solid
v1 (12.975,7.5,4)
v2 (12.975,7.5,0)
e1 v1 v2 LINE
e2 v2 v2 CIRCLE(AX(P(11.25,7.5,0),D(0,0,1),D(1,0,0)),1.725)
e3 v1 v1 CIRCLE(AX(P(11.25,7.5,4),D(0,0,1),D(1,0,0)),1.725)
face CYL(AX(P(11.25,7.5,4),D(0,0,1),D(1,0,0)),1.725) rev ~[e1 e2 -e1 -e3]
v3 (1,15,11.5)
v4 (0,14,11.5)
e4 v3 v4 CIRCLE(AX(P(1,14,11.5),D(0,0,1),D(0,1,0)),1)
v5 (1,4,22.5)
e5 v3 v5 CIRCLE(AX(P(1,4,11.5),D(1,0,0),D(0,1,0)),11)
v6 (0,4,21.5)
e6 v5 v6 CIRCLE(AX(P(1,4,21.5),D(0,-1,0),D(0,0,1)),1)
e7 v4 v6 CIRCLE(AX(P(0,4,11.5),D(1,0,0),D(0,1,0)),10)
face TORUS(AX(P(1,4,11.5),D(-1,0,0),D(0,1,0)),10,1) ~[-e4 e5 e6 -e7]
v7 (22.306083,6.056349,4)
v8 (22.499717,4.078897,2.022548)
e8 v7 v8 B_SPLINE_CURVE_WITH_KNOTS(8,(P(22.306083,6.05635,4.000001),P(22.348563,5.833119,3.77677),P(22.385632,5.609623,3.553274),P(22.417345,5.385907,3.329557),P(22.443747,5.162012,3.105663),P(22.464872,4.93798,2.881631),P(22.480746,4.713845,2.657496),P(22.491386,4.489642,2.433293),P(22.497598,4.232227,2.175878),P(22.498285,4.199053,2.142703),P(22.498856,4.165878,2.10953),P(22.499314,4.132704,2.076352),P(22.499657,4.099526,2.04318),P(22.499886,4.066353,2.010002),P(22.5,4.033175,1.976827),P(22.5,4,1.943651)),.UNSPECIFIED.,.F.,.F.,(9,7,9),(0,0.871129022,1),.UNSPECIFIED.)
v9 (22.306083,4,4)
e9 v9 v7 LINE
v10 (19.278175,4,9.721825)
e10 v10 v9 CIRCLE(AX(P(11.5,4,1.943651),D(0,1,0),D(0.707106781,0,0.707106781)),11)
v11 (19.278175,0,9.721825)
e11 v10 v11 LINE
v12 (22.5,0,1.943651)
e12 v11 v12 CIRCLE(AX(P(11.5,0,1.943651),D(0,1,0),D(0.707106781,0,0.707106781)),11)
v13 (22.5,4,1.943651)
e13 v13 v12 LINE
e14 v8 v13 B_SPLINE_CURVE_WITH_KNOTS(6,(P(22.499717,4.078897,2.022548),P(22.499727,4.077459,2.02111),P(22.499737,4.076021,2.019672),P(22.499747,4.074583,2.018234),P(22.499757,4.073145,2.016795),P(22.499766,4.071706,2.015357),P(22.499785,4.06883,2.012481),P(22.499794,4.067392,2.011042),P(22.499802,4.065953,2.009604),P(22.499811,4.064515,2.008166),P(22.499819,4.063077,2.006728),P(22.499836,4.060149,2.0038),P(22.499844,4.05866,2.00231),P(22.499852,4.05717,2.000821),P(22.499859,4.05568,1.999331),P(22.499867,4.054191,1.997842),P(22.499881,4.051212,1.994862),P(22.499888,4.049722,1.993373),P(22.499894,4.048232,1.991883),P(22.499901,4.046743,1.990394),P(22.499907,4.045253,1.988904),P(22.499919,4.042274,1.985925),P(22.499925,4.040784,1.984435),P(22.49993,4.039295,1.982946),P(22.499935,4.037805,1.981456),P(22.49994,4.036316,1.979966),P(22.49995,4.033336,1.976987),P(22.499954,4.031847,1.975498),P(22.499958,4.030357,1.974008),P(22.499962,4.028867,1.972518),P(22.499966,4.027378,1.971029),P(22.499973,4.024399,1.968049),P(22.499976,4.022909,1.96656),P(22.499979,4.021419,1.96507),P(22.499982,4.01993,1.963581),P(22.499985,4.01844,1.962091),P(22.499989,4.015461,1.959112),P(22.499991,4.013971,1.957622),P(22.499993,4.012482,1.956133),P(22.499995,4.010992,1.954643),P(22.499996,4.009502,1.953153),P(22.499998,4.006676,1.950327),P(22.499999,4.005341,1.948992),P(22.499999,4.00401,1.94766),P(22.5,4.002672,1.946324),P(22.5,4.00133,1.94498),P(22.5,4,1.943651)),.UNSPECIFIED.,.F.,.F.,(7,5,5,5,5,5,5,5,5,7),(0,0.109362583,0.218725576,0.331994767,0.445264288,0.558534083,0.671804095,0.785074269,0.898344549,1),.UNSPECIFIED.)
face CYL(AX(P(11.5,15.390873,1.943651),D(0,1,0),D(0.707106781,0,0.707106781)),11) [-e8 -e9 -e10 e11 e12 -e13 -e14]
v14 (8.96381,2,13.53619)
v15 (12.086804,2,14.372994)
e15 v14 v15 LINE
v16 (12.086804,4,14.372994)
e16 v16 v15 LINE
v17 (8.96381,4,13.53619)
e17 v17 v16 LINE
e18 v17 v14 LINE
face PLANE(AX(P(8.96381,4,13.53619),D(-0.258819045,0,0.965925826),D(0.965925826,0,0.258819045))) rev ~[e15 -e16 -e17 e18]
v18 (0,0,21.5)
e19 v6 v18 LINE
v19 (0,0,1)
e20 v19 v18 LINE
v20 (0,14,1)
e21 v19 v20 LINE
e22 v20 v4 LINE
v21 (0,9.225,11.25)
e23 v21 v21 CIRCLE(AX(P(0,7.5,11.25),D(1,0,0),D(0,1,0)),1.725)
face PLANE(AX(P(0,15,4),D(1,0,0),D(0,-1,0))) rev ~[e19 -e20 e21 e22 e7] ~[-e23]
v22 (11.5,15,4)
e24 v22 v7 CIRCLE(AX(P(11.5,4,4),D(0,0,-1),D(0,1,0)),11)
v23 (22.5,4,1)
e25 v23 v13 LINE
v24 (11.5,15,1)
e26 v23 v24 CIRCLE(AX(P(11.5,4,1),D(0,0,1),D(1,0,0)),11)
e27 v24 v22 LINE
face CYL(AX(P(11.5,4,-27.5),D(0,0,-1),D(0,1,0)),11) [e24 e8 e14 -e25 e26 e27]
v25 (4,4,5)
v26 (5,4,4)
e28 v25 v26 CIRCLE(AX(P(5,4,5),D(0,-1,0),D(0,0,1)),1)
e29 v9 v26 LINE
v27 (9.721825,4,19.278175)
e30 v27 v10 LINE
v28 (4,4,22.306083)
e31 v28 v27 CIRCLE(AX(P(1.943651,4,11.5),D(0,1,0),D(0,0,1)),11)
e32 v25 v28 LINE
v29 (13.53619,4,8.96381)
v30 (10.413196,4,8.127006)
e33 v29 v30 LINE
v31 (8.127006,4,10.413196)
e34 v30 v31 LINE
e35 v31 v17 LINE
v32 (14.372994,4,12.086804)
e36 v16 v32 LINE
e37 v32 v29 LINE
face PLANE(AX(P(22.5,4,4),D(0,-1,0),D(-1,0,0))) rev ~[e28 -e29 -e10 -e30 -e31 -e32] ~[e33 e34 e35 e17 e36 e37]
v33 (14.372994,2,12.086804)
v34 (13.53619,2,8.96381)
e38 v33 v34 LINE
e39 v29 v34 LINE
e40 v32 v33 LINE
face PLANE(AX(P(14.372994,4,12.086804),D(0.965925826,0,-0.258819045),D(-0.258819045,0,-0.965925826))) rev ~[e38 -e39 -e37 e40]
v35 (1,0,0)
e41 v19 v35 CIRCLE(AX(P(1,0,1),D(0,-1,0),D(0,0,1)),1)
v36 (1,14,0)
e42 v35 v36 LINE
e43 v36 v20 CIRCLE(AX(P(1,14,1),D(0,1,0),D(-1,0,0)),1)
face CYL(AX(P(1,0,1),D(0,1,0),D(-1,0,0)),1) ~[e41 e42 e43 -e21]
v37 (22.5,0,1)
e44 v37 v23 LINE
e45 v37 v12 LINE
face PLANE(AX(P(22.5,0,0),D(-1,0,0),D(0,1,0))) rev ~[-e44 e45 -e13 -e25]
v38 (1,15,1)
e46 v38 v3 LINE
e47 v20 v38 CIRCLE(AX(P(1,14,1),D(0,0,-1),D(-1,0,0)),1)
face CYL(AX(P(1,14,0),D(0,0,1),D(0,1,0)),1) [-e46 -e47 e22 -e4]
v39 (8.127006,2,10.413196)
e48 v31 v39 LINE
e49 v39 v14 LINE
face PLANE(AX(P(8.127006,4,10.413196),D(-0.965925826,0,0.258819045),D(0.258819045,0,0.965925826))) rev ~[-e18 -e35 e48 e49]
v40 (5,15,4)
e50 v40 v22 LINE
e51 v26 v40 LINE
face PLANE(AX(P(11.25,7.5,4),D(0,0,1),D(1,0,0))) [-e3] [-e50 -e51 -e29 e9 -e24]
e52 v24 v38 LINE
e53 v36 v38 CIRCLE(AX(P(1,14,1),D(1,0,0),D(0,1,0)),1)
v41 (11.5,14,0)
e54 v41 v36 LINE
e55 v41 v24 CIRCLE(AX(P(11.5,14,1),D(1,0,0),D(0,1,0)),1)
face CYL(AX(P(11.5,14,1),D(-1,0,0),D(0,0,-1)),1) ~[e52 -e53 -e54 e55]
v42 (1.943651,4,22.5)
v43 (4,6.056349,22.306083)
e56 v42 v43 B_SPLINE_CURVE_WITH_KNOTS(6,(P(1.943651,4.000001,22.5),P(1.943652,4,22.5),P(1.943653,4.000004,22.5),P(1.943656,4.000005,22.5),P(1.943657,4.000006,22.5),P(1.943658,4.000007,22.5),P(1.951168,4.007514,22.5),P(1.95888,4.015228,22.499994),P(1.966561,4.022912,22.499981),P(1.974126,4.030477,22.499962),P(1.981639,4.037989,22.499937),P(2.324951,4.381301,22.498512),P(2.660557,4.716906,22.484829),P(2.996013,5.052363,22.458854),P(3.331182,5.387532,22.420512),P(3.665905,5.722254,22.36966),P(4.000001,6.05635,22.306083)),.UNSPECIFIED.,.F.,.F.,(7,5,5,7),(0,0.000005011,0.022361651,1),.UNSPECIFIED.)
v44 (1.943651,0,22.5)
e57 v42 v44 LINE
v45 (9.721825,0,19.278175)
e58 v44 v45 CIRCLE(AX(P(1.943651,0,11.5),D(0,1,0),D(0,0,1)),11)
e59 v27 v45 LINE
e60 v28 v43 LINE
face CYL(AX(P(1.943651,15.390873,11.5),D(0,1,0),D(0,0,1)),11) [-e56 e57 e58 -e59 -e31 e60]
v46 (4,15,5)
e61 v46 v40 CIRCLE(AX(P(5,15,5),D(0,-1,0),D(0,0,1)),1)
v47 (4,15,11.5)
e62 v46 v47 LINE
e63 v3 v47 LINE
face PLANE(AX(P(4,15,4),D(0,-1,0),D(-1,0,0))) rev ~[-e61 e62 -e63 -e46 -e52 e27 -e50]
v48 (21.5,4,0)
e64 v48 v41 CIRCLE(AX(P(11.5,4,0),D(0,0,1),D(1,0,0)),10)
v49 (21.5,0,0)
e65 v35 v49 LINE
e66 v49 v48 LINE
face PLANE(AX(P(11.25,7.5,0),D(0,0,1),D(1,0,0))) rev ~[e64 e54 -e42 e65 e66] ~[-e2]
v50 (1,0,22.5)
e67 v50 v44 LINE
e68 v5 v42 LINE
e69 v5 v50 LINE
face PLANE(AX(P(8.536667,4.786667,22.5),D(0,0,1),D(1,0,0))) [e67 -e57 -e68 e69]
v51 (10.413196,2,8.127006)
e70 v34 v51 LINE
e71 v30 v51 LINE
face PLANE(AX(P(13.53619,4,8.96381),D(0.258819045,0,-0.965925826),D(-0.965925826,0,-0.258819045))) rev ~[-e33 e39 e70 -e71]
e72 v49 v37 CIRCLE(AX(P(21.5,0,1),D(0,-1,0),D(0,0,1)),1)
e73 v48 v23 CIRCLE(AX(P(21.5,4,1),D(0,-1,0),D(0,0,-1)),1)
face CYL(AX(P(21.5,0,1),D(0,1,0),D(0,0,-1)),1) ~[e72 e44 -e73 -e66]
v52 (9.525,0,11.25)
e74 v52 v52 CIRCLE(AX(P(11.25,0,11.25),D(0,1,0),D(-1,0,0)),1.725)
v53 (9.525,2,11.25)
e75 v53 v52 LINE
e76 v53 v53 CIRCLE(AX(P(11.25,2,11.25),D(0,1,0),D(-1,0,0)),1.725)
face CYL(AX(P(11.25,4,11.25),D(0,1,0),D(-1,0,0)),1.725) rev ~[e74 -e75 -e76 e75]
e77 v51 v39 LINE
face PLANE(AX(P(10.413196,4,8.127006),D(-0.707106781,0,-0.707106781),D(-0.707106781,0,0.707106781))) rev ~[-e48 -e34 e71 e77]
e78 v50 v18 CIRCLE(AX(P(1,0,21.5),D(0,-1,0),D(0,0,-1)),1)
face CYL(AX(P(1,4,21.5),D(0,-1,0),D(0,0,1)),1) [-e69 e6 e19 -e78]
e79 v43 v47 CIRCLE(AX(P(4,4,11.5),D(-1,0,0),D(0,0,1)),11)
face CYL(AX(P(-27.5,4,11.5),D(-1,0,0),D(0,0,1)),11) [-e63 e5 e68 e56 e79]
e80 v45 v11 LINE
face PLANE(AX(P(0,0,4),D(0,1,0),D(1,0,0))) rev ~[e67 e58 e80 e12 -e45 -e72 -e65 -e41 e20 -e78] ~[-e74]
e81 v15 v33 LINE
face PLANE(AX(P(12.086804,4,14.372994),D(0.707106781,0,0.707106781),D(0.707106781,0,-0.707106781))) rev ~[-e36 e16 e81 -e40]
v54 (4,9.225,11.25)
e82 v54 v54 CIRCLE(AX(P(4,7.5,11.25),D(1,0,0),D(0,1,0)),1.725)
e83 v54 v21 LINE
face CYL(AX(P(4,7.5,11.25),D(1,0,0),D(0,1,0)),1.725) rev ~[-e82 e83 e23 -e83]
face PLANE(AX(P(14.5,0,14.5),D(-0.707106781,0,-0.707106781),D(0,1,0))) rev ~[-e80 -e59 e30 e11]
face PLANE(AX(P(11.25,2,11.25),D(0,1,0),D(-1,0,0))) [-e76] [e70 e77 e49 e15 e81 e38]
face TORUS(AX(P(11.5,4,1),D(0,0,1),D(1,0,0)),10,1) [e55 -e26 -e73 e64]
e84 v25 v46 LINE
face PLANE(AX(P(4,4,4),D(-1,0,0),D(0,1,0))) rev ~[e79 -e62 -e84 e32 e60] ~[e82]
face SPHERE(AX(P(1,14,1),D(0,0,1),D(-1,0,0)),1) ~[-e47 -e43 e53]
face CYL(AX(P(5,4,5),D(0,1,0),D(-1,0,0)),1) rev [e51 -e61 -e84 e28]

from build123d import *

# Parameters (mm, degrees)
F1_W         = 22.5
F1_H         = 15
F2_DEPTH     = 4
F4_DEPTH     = 18.5
F5_R         = 1.725
F6_DEPTH     = 4
F7_R         = 1.725
F8_DEPTH     = 4
F9_R         = 1.725
F10_DEPTH    = 4
F11_DEPTH    = 2
F12_SIZE     = 16
F13_T1_DEPTH = 59
F13_T3_DEPTH = 59
F13_T5_DEPTH = 26.7817459305
F14_R        = 1


# Not quite as in the source:
# - a fillet or chamfer that OpenCascade refuses, or shapes differently, is made with other operations: its cross-section is extruded or revolved along the edge and cut away or added


with BuildPart() as f2:
    # F1 (on Top) → F2 (new body)
    with BuildSketch(Plane.XY):
        with Locations((11.25, 7.5)):
            Rectangle(F1_W, F1_H)
    extrude(amount=F2_DEPTH)

    # F3 (on face) → F4 (join)
    with BuildSketch(Plane.XY.offset(4)):
        Polygon((4, 15), (0, 15), (0, 0), (22.5, 0), (22.5, 4), (4, 4), align=None)
    extrude(amount=F4_DEPTH)

    # F5 (on face) → F6 (cut, through all)
    with BuildSketch(Plane.XY.offset(4)):
        with Locations((11.25, 7.5)):
            Circle(F5_R)
    extrude(amount=-F6_DEPTH, mode=Mode.SUBTRACT)

    # F7 (on face) → F8 (cut, through all)
    with BuildSketch(Plane.YZ.offset(4)):
        with Locations((7.5, 11.25)):
            Circle(F7_R)
    extrude(amount=-F8_DEPTH, mode=Mode.SUBTRACT)

    # F9 (on face) → F10 (cut, through all)
    with BuildSketch(Plane(origin=(0, 4, 0), x_dir=(-1, 0, 0), z_dir=(0, 1, 0))):
        with Locations((-11.25, 11.25)):
            Circle(F9_R)
    extrude(amount=-F10_DEPTH, mode=Mode.SUBTRACT)

    # F9 (on face) → F11 (cut)
    with BuildSketch(Plane(origin=(0, 4, 0), x_dir=(-1, 0, 0), z_dir=(0, 1, 0))):
        Polygon((-8.1270057994, 10.413196226), (-8.9638095734, 13.5361904266), (-12.086803774, 14.3729942006), (-14.3729942006, 12.086803774), (-13.5361904266, 8.9638095734), (-10.413196226, 8.1270057994), align=None)
        with Locations((-11.25, 11.25)):
            Circle(F9_R, mode=Mode.SUBTRACT)
    extrude(amount=-F11_DEPTH, mode=Mode.SUBTRACT)

    # F12
    f12_edges = [f2.edges().sort_by_distance(p)[0] for p in [
        (22.5, 2, 22.5),
    ]]
    chamfer(f12_edges, length=F12_SIZE)

    # F13: fillet of radius 11 on 4 edges, made by hand

    # F13_s2 → F13_t1 (cut)
    with BuildSketch(Plane.XY.offset(-27.5)):
        with BuildLine():
            ThreePointArc((11.5, 15), (19.2781745931, 11.7781745931), (22.5, 4))
            Line((22.5, 4), (22.5, 15))
            Line((22.5, 15), (11.5, 15))
        make_face()
    extrude(amount=F13_T1_DEPTH, mode=Mode.SUBTRACT)

    # F13_s4 → F13_t3 (cut)
    with BuildSketch(Plane.YZ.offset(-27.5)):
        with BuildLine():
            ThreePointArc((4, 22.5), (11.7781745931, 19.2781745931), (15, 11.5))
            Line((15, 11.5), (15, 22.5))
            Line((15, 22.5), (4, 22.5))
        make_face()
    extrude(amount=F13_T3_DEPTH, mode=Mode.SUBTRACT)

    # F13_s6 → F13_t5 (cut)
    with BuildSketch(Plane.XZ.offset(-15.3908729653)):
        with BuildLine():
            ThreePointArc((1.9436508139, 22.5), (6.1531685699, 21.6626748576), (9.7218254069, 19.2781745931))
            Line((9.7218254069, 19.2781745931), (6.5, 22.5))
            Line((6.5, 22.5), (1.9436508139, 22.5))
        make_face()
        with BuildLine():
            ThreePointArc((19.2781745931, 9.7218254069), (21.6626748576, 6.1531685699), (22.5, 1.9436508139))
            Line((22.5, 1.9436508139), (22.5, 6.5))
            Line((22.5, 6.5), (19.2781745931, 9.7218254069))
        make_face()
    extrude(amount=F13_T5_DEPTH, mode=Mode.SUBTRACT)

    # F14
    f14_edges = [f2.edges().sort_by_distance(p)[0] for p in [
        (0, 2, 22.5),
        (0, 7.5, 0),
        (22.5, 2, 0),
        (4, 9.5, 4),
        (0, 15, 5.75),
        (0, 11.778175, 19.278175),
        (5.75, 15, 0),
        (19.278175, 11.778175, 0),
    ]]
    fillet(f14_edges, radius=F14_R)


solid = f2.part
